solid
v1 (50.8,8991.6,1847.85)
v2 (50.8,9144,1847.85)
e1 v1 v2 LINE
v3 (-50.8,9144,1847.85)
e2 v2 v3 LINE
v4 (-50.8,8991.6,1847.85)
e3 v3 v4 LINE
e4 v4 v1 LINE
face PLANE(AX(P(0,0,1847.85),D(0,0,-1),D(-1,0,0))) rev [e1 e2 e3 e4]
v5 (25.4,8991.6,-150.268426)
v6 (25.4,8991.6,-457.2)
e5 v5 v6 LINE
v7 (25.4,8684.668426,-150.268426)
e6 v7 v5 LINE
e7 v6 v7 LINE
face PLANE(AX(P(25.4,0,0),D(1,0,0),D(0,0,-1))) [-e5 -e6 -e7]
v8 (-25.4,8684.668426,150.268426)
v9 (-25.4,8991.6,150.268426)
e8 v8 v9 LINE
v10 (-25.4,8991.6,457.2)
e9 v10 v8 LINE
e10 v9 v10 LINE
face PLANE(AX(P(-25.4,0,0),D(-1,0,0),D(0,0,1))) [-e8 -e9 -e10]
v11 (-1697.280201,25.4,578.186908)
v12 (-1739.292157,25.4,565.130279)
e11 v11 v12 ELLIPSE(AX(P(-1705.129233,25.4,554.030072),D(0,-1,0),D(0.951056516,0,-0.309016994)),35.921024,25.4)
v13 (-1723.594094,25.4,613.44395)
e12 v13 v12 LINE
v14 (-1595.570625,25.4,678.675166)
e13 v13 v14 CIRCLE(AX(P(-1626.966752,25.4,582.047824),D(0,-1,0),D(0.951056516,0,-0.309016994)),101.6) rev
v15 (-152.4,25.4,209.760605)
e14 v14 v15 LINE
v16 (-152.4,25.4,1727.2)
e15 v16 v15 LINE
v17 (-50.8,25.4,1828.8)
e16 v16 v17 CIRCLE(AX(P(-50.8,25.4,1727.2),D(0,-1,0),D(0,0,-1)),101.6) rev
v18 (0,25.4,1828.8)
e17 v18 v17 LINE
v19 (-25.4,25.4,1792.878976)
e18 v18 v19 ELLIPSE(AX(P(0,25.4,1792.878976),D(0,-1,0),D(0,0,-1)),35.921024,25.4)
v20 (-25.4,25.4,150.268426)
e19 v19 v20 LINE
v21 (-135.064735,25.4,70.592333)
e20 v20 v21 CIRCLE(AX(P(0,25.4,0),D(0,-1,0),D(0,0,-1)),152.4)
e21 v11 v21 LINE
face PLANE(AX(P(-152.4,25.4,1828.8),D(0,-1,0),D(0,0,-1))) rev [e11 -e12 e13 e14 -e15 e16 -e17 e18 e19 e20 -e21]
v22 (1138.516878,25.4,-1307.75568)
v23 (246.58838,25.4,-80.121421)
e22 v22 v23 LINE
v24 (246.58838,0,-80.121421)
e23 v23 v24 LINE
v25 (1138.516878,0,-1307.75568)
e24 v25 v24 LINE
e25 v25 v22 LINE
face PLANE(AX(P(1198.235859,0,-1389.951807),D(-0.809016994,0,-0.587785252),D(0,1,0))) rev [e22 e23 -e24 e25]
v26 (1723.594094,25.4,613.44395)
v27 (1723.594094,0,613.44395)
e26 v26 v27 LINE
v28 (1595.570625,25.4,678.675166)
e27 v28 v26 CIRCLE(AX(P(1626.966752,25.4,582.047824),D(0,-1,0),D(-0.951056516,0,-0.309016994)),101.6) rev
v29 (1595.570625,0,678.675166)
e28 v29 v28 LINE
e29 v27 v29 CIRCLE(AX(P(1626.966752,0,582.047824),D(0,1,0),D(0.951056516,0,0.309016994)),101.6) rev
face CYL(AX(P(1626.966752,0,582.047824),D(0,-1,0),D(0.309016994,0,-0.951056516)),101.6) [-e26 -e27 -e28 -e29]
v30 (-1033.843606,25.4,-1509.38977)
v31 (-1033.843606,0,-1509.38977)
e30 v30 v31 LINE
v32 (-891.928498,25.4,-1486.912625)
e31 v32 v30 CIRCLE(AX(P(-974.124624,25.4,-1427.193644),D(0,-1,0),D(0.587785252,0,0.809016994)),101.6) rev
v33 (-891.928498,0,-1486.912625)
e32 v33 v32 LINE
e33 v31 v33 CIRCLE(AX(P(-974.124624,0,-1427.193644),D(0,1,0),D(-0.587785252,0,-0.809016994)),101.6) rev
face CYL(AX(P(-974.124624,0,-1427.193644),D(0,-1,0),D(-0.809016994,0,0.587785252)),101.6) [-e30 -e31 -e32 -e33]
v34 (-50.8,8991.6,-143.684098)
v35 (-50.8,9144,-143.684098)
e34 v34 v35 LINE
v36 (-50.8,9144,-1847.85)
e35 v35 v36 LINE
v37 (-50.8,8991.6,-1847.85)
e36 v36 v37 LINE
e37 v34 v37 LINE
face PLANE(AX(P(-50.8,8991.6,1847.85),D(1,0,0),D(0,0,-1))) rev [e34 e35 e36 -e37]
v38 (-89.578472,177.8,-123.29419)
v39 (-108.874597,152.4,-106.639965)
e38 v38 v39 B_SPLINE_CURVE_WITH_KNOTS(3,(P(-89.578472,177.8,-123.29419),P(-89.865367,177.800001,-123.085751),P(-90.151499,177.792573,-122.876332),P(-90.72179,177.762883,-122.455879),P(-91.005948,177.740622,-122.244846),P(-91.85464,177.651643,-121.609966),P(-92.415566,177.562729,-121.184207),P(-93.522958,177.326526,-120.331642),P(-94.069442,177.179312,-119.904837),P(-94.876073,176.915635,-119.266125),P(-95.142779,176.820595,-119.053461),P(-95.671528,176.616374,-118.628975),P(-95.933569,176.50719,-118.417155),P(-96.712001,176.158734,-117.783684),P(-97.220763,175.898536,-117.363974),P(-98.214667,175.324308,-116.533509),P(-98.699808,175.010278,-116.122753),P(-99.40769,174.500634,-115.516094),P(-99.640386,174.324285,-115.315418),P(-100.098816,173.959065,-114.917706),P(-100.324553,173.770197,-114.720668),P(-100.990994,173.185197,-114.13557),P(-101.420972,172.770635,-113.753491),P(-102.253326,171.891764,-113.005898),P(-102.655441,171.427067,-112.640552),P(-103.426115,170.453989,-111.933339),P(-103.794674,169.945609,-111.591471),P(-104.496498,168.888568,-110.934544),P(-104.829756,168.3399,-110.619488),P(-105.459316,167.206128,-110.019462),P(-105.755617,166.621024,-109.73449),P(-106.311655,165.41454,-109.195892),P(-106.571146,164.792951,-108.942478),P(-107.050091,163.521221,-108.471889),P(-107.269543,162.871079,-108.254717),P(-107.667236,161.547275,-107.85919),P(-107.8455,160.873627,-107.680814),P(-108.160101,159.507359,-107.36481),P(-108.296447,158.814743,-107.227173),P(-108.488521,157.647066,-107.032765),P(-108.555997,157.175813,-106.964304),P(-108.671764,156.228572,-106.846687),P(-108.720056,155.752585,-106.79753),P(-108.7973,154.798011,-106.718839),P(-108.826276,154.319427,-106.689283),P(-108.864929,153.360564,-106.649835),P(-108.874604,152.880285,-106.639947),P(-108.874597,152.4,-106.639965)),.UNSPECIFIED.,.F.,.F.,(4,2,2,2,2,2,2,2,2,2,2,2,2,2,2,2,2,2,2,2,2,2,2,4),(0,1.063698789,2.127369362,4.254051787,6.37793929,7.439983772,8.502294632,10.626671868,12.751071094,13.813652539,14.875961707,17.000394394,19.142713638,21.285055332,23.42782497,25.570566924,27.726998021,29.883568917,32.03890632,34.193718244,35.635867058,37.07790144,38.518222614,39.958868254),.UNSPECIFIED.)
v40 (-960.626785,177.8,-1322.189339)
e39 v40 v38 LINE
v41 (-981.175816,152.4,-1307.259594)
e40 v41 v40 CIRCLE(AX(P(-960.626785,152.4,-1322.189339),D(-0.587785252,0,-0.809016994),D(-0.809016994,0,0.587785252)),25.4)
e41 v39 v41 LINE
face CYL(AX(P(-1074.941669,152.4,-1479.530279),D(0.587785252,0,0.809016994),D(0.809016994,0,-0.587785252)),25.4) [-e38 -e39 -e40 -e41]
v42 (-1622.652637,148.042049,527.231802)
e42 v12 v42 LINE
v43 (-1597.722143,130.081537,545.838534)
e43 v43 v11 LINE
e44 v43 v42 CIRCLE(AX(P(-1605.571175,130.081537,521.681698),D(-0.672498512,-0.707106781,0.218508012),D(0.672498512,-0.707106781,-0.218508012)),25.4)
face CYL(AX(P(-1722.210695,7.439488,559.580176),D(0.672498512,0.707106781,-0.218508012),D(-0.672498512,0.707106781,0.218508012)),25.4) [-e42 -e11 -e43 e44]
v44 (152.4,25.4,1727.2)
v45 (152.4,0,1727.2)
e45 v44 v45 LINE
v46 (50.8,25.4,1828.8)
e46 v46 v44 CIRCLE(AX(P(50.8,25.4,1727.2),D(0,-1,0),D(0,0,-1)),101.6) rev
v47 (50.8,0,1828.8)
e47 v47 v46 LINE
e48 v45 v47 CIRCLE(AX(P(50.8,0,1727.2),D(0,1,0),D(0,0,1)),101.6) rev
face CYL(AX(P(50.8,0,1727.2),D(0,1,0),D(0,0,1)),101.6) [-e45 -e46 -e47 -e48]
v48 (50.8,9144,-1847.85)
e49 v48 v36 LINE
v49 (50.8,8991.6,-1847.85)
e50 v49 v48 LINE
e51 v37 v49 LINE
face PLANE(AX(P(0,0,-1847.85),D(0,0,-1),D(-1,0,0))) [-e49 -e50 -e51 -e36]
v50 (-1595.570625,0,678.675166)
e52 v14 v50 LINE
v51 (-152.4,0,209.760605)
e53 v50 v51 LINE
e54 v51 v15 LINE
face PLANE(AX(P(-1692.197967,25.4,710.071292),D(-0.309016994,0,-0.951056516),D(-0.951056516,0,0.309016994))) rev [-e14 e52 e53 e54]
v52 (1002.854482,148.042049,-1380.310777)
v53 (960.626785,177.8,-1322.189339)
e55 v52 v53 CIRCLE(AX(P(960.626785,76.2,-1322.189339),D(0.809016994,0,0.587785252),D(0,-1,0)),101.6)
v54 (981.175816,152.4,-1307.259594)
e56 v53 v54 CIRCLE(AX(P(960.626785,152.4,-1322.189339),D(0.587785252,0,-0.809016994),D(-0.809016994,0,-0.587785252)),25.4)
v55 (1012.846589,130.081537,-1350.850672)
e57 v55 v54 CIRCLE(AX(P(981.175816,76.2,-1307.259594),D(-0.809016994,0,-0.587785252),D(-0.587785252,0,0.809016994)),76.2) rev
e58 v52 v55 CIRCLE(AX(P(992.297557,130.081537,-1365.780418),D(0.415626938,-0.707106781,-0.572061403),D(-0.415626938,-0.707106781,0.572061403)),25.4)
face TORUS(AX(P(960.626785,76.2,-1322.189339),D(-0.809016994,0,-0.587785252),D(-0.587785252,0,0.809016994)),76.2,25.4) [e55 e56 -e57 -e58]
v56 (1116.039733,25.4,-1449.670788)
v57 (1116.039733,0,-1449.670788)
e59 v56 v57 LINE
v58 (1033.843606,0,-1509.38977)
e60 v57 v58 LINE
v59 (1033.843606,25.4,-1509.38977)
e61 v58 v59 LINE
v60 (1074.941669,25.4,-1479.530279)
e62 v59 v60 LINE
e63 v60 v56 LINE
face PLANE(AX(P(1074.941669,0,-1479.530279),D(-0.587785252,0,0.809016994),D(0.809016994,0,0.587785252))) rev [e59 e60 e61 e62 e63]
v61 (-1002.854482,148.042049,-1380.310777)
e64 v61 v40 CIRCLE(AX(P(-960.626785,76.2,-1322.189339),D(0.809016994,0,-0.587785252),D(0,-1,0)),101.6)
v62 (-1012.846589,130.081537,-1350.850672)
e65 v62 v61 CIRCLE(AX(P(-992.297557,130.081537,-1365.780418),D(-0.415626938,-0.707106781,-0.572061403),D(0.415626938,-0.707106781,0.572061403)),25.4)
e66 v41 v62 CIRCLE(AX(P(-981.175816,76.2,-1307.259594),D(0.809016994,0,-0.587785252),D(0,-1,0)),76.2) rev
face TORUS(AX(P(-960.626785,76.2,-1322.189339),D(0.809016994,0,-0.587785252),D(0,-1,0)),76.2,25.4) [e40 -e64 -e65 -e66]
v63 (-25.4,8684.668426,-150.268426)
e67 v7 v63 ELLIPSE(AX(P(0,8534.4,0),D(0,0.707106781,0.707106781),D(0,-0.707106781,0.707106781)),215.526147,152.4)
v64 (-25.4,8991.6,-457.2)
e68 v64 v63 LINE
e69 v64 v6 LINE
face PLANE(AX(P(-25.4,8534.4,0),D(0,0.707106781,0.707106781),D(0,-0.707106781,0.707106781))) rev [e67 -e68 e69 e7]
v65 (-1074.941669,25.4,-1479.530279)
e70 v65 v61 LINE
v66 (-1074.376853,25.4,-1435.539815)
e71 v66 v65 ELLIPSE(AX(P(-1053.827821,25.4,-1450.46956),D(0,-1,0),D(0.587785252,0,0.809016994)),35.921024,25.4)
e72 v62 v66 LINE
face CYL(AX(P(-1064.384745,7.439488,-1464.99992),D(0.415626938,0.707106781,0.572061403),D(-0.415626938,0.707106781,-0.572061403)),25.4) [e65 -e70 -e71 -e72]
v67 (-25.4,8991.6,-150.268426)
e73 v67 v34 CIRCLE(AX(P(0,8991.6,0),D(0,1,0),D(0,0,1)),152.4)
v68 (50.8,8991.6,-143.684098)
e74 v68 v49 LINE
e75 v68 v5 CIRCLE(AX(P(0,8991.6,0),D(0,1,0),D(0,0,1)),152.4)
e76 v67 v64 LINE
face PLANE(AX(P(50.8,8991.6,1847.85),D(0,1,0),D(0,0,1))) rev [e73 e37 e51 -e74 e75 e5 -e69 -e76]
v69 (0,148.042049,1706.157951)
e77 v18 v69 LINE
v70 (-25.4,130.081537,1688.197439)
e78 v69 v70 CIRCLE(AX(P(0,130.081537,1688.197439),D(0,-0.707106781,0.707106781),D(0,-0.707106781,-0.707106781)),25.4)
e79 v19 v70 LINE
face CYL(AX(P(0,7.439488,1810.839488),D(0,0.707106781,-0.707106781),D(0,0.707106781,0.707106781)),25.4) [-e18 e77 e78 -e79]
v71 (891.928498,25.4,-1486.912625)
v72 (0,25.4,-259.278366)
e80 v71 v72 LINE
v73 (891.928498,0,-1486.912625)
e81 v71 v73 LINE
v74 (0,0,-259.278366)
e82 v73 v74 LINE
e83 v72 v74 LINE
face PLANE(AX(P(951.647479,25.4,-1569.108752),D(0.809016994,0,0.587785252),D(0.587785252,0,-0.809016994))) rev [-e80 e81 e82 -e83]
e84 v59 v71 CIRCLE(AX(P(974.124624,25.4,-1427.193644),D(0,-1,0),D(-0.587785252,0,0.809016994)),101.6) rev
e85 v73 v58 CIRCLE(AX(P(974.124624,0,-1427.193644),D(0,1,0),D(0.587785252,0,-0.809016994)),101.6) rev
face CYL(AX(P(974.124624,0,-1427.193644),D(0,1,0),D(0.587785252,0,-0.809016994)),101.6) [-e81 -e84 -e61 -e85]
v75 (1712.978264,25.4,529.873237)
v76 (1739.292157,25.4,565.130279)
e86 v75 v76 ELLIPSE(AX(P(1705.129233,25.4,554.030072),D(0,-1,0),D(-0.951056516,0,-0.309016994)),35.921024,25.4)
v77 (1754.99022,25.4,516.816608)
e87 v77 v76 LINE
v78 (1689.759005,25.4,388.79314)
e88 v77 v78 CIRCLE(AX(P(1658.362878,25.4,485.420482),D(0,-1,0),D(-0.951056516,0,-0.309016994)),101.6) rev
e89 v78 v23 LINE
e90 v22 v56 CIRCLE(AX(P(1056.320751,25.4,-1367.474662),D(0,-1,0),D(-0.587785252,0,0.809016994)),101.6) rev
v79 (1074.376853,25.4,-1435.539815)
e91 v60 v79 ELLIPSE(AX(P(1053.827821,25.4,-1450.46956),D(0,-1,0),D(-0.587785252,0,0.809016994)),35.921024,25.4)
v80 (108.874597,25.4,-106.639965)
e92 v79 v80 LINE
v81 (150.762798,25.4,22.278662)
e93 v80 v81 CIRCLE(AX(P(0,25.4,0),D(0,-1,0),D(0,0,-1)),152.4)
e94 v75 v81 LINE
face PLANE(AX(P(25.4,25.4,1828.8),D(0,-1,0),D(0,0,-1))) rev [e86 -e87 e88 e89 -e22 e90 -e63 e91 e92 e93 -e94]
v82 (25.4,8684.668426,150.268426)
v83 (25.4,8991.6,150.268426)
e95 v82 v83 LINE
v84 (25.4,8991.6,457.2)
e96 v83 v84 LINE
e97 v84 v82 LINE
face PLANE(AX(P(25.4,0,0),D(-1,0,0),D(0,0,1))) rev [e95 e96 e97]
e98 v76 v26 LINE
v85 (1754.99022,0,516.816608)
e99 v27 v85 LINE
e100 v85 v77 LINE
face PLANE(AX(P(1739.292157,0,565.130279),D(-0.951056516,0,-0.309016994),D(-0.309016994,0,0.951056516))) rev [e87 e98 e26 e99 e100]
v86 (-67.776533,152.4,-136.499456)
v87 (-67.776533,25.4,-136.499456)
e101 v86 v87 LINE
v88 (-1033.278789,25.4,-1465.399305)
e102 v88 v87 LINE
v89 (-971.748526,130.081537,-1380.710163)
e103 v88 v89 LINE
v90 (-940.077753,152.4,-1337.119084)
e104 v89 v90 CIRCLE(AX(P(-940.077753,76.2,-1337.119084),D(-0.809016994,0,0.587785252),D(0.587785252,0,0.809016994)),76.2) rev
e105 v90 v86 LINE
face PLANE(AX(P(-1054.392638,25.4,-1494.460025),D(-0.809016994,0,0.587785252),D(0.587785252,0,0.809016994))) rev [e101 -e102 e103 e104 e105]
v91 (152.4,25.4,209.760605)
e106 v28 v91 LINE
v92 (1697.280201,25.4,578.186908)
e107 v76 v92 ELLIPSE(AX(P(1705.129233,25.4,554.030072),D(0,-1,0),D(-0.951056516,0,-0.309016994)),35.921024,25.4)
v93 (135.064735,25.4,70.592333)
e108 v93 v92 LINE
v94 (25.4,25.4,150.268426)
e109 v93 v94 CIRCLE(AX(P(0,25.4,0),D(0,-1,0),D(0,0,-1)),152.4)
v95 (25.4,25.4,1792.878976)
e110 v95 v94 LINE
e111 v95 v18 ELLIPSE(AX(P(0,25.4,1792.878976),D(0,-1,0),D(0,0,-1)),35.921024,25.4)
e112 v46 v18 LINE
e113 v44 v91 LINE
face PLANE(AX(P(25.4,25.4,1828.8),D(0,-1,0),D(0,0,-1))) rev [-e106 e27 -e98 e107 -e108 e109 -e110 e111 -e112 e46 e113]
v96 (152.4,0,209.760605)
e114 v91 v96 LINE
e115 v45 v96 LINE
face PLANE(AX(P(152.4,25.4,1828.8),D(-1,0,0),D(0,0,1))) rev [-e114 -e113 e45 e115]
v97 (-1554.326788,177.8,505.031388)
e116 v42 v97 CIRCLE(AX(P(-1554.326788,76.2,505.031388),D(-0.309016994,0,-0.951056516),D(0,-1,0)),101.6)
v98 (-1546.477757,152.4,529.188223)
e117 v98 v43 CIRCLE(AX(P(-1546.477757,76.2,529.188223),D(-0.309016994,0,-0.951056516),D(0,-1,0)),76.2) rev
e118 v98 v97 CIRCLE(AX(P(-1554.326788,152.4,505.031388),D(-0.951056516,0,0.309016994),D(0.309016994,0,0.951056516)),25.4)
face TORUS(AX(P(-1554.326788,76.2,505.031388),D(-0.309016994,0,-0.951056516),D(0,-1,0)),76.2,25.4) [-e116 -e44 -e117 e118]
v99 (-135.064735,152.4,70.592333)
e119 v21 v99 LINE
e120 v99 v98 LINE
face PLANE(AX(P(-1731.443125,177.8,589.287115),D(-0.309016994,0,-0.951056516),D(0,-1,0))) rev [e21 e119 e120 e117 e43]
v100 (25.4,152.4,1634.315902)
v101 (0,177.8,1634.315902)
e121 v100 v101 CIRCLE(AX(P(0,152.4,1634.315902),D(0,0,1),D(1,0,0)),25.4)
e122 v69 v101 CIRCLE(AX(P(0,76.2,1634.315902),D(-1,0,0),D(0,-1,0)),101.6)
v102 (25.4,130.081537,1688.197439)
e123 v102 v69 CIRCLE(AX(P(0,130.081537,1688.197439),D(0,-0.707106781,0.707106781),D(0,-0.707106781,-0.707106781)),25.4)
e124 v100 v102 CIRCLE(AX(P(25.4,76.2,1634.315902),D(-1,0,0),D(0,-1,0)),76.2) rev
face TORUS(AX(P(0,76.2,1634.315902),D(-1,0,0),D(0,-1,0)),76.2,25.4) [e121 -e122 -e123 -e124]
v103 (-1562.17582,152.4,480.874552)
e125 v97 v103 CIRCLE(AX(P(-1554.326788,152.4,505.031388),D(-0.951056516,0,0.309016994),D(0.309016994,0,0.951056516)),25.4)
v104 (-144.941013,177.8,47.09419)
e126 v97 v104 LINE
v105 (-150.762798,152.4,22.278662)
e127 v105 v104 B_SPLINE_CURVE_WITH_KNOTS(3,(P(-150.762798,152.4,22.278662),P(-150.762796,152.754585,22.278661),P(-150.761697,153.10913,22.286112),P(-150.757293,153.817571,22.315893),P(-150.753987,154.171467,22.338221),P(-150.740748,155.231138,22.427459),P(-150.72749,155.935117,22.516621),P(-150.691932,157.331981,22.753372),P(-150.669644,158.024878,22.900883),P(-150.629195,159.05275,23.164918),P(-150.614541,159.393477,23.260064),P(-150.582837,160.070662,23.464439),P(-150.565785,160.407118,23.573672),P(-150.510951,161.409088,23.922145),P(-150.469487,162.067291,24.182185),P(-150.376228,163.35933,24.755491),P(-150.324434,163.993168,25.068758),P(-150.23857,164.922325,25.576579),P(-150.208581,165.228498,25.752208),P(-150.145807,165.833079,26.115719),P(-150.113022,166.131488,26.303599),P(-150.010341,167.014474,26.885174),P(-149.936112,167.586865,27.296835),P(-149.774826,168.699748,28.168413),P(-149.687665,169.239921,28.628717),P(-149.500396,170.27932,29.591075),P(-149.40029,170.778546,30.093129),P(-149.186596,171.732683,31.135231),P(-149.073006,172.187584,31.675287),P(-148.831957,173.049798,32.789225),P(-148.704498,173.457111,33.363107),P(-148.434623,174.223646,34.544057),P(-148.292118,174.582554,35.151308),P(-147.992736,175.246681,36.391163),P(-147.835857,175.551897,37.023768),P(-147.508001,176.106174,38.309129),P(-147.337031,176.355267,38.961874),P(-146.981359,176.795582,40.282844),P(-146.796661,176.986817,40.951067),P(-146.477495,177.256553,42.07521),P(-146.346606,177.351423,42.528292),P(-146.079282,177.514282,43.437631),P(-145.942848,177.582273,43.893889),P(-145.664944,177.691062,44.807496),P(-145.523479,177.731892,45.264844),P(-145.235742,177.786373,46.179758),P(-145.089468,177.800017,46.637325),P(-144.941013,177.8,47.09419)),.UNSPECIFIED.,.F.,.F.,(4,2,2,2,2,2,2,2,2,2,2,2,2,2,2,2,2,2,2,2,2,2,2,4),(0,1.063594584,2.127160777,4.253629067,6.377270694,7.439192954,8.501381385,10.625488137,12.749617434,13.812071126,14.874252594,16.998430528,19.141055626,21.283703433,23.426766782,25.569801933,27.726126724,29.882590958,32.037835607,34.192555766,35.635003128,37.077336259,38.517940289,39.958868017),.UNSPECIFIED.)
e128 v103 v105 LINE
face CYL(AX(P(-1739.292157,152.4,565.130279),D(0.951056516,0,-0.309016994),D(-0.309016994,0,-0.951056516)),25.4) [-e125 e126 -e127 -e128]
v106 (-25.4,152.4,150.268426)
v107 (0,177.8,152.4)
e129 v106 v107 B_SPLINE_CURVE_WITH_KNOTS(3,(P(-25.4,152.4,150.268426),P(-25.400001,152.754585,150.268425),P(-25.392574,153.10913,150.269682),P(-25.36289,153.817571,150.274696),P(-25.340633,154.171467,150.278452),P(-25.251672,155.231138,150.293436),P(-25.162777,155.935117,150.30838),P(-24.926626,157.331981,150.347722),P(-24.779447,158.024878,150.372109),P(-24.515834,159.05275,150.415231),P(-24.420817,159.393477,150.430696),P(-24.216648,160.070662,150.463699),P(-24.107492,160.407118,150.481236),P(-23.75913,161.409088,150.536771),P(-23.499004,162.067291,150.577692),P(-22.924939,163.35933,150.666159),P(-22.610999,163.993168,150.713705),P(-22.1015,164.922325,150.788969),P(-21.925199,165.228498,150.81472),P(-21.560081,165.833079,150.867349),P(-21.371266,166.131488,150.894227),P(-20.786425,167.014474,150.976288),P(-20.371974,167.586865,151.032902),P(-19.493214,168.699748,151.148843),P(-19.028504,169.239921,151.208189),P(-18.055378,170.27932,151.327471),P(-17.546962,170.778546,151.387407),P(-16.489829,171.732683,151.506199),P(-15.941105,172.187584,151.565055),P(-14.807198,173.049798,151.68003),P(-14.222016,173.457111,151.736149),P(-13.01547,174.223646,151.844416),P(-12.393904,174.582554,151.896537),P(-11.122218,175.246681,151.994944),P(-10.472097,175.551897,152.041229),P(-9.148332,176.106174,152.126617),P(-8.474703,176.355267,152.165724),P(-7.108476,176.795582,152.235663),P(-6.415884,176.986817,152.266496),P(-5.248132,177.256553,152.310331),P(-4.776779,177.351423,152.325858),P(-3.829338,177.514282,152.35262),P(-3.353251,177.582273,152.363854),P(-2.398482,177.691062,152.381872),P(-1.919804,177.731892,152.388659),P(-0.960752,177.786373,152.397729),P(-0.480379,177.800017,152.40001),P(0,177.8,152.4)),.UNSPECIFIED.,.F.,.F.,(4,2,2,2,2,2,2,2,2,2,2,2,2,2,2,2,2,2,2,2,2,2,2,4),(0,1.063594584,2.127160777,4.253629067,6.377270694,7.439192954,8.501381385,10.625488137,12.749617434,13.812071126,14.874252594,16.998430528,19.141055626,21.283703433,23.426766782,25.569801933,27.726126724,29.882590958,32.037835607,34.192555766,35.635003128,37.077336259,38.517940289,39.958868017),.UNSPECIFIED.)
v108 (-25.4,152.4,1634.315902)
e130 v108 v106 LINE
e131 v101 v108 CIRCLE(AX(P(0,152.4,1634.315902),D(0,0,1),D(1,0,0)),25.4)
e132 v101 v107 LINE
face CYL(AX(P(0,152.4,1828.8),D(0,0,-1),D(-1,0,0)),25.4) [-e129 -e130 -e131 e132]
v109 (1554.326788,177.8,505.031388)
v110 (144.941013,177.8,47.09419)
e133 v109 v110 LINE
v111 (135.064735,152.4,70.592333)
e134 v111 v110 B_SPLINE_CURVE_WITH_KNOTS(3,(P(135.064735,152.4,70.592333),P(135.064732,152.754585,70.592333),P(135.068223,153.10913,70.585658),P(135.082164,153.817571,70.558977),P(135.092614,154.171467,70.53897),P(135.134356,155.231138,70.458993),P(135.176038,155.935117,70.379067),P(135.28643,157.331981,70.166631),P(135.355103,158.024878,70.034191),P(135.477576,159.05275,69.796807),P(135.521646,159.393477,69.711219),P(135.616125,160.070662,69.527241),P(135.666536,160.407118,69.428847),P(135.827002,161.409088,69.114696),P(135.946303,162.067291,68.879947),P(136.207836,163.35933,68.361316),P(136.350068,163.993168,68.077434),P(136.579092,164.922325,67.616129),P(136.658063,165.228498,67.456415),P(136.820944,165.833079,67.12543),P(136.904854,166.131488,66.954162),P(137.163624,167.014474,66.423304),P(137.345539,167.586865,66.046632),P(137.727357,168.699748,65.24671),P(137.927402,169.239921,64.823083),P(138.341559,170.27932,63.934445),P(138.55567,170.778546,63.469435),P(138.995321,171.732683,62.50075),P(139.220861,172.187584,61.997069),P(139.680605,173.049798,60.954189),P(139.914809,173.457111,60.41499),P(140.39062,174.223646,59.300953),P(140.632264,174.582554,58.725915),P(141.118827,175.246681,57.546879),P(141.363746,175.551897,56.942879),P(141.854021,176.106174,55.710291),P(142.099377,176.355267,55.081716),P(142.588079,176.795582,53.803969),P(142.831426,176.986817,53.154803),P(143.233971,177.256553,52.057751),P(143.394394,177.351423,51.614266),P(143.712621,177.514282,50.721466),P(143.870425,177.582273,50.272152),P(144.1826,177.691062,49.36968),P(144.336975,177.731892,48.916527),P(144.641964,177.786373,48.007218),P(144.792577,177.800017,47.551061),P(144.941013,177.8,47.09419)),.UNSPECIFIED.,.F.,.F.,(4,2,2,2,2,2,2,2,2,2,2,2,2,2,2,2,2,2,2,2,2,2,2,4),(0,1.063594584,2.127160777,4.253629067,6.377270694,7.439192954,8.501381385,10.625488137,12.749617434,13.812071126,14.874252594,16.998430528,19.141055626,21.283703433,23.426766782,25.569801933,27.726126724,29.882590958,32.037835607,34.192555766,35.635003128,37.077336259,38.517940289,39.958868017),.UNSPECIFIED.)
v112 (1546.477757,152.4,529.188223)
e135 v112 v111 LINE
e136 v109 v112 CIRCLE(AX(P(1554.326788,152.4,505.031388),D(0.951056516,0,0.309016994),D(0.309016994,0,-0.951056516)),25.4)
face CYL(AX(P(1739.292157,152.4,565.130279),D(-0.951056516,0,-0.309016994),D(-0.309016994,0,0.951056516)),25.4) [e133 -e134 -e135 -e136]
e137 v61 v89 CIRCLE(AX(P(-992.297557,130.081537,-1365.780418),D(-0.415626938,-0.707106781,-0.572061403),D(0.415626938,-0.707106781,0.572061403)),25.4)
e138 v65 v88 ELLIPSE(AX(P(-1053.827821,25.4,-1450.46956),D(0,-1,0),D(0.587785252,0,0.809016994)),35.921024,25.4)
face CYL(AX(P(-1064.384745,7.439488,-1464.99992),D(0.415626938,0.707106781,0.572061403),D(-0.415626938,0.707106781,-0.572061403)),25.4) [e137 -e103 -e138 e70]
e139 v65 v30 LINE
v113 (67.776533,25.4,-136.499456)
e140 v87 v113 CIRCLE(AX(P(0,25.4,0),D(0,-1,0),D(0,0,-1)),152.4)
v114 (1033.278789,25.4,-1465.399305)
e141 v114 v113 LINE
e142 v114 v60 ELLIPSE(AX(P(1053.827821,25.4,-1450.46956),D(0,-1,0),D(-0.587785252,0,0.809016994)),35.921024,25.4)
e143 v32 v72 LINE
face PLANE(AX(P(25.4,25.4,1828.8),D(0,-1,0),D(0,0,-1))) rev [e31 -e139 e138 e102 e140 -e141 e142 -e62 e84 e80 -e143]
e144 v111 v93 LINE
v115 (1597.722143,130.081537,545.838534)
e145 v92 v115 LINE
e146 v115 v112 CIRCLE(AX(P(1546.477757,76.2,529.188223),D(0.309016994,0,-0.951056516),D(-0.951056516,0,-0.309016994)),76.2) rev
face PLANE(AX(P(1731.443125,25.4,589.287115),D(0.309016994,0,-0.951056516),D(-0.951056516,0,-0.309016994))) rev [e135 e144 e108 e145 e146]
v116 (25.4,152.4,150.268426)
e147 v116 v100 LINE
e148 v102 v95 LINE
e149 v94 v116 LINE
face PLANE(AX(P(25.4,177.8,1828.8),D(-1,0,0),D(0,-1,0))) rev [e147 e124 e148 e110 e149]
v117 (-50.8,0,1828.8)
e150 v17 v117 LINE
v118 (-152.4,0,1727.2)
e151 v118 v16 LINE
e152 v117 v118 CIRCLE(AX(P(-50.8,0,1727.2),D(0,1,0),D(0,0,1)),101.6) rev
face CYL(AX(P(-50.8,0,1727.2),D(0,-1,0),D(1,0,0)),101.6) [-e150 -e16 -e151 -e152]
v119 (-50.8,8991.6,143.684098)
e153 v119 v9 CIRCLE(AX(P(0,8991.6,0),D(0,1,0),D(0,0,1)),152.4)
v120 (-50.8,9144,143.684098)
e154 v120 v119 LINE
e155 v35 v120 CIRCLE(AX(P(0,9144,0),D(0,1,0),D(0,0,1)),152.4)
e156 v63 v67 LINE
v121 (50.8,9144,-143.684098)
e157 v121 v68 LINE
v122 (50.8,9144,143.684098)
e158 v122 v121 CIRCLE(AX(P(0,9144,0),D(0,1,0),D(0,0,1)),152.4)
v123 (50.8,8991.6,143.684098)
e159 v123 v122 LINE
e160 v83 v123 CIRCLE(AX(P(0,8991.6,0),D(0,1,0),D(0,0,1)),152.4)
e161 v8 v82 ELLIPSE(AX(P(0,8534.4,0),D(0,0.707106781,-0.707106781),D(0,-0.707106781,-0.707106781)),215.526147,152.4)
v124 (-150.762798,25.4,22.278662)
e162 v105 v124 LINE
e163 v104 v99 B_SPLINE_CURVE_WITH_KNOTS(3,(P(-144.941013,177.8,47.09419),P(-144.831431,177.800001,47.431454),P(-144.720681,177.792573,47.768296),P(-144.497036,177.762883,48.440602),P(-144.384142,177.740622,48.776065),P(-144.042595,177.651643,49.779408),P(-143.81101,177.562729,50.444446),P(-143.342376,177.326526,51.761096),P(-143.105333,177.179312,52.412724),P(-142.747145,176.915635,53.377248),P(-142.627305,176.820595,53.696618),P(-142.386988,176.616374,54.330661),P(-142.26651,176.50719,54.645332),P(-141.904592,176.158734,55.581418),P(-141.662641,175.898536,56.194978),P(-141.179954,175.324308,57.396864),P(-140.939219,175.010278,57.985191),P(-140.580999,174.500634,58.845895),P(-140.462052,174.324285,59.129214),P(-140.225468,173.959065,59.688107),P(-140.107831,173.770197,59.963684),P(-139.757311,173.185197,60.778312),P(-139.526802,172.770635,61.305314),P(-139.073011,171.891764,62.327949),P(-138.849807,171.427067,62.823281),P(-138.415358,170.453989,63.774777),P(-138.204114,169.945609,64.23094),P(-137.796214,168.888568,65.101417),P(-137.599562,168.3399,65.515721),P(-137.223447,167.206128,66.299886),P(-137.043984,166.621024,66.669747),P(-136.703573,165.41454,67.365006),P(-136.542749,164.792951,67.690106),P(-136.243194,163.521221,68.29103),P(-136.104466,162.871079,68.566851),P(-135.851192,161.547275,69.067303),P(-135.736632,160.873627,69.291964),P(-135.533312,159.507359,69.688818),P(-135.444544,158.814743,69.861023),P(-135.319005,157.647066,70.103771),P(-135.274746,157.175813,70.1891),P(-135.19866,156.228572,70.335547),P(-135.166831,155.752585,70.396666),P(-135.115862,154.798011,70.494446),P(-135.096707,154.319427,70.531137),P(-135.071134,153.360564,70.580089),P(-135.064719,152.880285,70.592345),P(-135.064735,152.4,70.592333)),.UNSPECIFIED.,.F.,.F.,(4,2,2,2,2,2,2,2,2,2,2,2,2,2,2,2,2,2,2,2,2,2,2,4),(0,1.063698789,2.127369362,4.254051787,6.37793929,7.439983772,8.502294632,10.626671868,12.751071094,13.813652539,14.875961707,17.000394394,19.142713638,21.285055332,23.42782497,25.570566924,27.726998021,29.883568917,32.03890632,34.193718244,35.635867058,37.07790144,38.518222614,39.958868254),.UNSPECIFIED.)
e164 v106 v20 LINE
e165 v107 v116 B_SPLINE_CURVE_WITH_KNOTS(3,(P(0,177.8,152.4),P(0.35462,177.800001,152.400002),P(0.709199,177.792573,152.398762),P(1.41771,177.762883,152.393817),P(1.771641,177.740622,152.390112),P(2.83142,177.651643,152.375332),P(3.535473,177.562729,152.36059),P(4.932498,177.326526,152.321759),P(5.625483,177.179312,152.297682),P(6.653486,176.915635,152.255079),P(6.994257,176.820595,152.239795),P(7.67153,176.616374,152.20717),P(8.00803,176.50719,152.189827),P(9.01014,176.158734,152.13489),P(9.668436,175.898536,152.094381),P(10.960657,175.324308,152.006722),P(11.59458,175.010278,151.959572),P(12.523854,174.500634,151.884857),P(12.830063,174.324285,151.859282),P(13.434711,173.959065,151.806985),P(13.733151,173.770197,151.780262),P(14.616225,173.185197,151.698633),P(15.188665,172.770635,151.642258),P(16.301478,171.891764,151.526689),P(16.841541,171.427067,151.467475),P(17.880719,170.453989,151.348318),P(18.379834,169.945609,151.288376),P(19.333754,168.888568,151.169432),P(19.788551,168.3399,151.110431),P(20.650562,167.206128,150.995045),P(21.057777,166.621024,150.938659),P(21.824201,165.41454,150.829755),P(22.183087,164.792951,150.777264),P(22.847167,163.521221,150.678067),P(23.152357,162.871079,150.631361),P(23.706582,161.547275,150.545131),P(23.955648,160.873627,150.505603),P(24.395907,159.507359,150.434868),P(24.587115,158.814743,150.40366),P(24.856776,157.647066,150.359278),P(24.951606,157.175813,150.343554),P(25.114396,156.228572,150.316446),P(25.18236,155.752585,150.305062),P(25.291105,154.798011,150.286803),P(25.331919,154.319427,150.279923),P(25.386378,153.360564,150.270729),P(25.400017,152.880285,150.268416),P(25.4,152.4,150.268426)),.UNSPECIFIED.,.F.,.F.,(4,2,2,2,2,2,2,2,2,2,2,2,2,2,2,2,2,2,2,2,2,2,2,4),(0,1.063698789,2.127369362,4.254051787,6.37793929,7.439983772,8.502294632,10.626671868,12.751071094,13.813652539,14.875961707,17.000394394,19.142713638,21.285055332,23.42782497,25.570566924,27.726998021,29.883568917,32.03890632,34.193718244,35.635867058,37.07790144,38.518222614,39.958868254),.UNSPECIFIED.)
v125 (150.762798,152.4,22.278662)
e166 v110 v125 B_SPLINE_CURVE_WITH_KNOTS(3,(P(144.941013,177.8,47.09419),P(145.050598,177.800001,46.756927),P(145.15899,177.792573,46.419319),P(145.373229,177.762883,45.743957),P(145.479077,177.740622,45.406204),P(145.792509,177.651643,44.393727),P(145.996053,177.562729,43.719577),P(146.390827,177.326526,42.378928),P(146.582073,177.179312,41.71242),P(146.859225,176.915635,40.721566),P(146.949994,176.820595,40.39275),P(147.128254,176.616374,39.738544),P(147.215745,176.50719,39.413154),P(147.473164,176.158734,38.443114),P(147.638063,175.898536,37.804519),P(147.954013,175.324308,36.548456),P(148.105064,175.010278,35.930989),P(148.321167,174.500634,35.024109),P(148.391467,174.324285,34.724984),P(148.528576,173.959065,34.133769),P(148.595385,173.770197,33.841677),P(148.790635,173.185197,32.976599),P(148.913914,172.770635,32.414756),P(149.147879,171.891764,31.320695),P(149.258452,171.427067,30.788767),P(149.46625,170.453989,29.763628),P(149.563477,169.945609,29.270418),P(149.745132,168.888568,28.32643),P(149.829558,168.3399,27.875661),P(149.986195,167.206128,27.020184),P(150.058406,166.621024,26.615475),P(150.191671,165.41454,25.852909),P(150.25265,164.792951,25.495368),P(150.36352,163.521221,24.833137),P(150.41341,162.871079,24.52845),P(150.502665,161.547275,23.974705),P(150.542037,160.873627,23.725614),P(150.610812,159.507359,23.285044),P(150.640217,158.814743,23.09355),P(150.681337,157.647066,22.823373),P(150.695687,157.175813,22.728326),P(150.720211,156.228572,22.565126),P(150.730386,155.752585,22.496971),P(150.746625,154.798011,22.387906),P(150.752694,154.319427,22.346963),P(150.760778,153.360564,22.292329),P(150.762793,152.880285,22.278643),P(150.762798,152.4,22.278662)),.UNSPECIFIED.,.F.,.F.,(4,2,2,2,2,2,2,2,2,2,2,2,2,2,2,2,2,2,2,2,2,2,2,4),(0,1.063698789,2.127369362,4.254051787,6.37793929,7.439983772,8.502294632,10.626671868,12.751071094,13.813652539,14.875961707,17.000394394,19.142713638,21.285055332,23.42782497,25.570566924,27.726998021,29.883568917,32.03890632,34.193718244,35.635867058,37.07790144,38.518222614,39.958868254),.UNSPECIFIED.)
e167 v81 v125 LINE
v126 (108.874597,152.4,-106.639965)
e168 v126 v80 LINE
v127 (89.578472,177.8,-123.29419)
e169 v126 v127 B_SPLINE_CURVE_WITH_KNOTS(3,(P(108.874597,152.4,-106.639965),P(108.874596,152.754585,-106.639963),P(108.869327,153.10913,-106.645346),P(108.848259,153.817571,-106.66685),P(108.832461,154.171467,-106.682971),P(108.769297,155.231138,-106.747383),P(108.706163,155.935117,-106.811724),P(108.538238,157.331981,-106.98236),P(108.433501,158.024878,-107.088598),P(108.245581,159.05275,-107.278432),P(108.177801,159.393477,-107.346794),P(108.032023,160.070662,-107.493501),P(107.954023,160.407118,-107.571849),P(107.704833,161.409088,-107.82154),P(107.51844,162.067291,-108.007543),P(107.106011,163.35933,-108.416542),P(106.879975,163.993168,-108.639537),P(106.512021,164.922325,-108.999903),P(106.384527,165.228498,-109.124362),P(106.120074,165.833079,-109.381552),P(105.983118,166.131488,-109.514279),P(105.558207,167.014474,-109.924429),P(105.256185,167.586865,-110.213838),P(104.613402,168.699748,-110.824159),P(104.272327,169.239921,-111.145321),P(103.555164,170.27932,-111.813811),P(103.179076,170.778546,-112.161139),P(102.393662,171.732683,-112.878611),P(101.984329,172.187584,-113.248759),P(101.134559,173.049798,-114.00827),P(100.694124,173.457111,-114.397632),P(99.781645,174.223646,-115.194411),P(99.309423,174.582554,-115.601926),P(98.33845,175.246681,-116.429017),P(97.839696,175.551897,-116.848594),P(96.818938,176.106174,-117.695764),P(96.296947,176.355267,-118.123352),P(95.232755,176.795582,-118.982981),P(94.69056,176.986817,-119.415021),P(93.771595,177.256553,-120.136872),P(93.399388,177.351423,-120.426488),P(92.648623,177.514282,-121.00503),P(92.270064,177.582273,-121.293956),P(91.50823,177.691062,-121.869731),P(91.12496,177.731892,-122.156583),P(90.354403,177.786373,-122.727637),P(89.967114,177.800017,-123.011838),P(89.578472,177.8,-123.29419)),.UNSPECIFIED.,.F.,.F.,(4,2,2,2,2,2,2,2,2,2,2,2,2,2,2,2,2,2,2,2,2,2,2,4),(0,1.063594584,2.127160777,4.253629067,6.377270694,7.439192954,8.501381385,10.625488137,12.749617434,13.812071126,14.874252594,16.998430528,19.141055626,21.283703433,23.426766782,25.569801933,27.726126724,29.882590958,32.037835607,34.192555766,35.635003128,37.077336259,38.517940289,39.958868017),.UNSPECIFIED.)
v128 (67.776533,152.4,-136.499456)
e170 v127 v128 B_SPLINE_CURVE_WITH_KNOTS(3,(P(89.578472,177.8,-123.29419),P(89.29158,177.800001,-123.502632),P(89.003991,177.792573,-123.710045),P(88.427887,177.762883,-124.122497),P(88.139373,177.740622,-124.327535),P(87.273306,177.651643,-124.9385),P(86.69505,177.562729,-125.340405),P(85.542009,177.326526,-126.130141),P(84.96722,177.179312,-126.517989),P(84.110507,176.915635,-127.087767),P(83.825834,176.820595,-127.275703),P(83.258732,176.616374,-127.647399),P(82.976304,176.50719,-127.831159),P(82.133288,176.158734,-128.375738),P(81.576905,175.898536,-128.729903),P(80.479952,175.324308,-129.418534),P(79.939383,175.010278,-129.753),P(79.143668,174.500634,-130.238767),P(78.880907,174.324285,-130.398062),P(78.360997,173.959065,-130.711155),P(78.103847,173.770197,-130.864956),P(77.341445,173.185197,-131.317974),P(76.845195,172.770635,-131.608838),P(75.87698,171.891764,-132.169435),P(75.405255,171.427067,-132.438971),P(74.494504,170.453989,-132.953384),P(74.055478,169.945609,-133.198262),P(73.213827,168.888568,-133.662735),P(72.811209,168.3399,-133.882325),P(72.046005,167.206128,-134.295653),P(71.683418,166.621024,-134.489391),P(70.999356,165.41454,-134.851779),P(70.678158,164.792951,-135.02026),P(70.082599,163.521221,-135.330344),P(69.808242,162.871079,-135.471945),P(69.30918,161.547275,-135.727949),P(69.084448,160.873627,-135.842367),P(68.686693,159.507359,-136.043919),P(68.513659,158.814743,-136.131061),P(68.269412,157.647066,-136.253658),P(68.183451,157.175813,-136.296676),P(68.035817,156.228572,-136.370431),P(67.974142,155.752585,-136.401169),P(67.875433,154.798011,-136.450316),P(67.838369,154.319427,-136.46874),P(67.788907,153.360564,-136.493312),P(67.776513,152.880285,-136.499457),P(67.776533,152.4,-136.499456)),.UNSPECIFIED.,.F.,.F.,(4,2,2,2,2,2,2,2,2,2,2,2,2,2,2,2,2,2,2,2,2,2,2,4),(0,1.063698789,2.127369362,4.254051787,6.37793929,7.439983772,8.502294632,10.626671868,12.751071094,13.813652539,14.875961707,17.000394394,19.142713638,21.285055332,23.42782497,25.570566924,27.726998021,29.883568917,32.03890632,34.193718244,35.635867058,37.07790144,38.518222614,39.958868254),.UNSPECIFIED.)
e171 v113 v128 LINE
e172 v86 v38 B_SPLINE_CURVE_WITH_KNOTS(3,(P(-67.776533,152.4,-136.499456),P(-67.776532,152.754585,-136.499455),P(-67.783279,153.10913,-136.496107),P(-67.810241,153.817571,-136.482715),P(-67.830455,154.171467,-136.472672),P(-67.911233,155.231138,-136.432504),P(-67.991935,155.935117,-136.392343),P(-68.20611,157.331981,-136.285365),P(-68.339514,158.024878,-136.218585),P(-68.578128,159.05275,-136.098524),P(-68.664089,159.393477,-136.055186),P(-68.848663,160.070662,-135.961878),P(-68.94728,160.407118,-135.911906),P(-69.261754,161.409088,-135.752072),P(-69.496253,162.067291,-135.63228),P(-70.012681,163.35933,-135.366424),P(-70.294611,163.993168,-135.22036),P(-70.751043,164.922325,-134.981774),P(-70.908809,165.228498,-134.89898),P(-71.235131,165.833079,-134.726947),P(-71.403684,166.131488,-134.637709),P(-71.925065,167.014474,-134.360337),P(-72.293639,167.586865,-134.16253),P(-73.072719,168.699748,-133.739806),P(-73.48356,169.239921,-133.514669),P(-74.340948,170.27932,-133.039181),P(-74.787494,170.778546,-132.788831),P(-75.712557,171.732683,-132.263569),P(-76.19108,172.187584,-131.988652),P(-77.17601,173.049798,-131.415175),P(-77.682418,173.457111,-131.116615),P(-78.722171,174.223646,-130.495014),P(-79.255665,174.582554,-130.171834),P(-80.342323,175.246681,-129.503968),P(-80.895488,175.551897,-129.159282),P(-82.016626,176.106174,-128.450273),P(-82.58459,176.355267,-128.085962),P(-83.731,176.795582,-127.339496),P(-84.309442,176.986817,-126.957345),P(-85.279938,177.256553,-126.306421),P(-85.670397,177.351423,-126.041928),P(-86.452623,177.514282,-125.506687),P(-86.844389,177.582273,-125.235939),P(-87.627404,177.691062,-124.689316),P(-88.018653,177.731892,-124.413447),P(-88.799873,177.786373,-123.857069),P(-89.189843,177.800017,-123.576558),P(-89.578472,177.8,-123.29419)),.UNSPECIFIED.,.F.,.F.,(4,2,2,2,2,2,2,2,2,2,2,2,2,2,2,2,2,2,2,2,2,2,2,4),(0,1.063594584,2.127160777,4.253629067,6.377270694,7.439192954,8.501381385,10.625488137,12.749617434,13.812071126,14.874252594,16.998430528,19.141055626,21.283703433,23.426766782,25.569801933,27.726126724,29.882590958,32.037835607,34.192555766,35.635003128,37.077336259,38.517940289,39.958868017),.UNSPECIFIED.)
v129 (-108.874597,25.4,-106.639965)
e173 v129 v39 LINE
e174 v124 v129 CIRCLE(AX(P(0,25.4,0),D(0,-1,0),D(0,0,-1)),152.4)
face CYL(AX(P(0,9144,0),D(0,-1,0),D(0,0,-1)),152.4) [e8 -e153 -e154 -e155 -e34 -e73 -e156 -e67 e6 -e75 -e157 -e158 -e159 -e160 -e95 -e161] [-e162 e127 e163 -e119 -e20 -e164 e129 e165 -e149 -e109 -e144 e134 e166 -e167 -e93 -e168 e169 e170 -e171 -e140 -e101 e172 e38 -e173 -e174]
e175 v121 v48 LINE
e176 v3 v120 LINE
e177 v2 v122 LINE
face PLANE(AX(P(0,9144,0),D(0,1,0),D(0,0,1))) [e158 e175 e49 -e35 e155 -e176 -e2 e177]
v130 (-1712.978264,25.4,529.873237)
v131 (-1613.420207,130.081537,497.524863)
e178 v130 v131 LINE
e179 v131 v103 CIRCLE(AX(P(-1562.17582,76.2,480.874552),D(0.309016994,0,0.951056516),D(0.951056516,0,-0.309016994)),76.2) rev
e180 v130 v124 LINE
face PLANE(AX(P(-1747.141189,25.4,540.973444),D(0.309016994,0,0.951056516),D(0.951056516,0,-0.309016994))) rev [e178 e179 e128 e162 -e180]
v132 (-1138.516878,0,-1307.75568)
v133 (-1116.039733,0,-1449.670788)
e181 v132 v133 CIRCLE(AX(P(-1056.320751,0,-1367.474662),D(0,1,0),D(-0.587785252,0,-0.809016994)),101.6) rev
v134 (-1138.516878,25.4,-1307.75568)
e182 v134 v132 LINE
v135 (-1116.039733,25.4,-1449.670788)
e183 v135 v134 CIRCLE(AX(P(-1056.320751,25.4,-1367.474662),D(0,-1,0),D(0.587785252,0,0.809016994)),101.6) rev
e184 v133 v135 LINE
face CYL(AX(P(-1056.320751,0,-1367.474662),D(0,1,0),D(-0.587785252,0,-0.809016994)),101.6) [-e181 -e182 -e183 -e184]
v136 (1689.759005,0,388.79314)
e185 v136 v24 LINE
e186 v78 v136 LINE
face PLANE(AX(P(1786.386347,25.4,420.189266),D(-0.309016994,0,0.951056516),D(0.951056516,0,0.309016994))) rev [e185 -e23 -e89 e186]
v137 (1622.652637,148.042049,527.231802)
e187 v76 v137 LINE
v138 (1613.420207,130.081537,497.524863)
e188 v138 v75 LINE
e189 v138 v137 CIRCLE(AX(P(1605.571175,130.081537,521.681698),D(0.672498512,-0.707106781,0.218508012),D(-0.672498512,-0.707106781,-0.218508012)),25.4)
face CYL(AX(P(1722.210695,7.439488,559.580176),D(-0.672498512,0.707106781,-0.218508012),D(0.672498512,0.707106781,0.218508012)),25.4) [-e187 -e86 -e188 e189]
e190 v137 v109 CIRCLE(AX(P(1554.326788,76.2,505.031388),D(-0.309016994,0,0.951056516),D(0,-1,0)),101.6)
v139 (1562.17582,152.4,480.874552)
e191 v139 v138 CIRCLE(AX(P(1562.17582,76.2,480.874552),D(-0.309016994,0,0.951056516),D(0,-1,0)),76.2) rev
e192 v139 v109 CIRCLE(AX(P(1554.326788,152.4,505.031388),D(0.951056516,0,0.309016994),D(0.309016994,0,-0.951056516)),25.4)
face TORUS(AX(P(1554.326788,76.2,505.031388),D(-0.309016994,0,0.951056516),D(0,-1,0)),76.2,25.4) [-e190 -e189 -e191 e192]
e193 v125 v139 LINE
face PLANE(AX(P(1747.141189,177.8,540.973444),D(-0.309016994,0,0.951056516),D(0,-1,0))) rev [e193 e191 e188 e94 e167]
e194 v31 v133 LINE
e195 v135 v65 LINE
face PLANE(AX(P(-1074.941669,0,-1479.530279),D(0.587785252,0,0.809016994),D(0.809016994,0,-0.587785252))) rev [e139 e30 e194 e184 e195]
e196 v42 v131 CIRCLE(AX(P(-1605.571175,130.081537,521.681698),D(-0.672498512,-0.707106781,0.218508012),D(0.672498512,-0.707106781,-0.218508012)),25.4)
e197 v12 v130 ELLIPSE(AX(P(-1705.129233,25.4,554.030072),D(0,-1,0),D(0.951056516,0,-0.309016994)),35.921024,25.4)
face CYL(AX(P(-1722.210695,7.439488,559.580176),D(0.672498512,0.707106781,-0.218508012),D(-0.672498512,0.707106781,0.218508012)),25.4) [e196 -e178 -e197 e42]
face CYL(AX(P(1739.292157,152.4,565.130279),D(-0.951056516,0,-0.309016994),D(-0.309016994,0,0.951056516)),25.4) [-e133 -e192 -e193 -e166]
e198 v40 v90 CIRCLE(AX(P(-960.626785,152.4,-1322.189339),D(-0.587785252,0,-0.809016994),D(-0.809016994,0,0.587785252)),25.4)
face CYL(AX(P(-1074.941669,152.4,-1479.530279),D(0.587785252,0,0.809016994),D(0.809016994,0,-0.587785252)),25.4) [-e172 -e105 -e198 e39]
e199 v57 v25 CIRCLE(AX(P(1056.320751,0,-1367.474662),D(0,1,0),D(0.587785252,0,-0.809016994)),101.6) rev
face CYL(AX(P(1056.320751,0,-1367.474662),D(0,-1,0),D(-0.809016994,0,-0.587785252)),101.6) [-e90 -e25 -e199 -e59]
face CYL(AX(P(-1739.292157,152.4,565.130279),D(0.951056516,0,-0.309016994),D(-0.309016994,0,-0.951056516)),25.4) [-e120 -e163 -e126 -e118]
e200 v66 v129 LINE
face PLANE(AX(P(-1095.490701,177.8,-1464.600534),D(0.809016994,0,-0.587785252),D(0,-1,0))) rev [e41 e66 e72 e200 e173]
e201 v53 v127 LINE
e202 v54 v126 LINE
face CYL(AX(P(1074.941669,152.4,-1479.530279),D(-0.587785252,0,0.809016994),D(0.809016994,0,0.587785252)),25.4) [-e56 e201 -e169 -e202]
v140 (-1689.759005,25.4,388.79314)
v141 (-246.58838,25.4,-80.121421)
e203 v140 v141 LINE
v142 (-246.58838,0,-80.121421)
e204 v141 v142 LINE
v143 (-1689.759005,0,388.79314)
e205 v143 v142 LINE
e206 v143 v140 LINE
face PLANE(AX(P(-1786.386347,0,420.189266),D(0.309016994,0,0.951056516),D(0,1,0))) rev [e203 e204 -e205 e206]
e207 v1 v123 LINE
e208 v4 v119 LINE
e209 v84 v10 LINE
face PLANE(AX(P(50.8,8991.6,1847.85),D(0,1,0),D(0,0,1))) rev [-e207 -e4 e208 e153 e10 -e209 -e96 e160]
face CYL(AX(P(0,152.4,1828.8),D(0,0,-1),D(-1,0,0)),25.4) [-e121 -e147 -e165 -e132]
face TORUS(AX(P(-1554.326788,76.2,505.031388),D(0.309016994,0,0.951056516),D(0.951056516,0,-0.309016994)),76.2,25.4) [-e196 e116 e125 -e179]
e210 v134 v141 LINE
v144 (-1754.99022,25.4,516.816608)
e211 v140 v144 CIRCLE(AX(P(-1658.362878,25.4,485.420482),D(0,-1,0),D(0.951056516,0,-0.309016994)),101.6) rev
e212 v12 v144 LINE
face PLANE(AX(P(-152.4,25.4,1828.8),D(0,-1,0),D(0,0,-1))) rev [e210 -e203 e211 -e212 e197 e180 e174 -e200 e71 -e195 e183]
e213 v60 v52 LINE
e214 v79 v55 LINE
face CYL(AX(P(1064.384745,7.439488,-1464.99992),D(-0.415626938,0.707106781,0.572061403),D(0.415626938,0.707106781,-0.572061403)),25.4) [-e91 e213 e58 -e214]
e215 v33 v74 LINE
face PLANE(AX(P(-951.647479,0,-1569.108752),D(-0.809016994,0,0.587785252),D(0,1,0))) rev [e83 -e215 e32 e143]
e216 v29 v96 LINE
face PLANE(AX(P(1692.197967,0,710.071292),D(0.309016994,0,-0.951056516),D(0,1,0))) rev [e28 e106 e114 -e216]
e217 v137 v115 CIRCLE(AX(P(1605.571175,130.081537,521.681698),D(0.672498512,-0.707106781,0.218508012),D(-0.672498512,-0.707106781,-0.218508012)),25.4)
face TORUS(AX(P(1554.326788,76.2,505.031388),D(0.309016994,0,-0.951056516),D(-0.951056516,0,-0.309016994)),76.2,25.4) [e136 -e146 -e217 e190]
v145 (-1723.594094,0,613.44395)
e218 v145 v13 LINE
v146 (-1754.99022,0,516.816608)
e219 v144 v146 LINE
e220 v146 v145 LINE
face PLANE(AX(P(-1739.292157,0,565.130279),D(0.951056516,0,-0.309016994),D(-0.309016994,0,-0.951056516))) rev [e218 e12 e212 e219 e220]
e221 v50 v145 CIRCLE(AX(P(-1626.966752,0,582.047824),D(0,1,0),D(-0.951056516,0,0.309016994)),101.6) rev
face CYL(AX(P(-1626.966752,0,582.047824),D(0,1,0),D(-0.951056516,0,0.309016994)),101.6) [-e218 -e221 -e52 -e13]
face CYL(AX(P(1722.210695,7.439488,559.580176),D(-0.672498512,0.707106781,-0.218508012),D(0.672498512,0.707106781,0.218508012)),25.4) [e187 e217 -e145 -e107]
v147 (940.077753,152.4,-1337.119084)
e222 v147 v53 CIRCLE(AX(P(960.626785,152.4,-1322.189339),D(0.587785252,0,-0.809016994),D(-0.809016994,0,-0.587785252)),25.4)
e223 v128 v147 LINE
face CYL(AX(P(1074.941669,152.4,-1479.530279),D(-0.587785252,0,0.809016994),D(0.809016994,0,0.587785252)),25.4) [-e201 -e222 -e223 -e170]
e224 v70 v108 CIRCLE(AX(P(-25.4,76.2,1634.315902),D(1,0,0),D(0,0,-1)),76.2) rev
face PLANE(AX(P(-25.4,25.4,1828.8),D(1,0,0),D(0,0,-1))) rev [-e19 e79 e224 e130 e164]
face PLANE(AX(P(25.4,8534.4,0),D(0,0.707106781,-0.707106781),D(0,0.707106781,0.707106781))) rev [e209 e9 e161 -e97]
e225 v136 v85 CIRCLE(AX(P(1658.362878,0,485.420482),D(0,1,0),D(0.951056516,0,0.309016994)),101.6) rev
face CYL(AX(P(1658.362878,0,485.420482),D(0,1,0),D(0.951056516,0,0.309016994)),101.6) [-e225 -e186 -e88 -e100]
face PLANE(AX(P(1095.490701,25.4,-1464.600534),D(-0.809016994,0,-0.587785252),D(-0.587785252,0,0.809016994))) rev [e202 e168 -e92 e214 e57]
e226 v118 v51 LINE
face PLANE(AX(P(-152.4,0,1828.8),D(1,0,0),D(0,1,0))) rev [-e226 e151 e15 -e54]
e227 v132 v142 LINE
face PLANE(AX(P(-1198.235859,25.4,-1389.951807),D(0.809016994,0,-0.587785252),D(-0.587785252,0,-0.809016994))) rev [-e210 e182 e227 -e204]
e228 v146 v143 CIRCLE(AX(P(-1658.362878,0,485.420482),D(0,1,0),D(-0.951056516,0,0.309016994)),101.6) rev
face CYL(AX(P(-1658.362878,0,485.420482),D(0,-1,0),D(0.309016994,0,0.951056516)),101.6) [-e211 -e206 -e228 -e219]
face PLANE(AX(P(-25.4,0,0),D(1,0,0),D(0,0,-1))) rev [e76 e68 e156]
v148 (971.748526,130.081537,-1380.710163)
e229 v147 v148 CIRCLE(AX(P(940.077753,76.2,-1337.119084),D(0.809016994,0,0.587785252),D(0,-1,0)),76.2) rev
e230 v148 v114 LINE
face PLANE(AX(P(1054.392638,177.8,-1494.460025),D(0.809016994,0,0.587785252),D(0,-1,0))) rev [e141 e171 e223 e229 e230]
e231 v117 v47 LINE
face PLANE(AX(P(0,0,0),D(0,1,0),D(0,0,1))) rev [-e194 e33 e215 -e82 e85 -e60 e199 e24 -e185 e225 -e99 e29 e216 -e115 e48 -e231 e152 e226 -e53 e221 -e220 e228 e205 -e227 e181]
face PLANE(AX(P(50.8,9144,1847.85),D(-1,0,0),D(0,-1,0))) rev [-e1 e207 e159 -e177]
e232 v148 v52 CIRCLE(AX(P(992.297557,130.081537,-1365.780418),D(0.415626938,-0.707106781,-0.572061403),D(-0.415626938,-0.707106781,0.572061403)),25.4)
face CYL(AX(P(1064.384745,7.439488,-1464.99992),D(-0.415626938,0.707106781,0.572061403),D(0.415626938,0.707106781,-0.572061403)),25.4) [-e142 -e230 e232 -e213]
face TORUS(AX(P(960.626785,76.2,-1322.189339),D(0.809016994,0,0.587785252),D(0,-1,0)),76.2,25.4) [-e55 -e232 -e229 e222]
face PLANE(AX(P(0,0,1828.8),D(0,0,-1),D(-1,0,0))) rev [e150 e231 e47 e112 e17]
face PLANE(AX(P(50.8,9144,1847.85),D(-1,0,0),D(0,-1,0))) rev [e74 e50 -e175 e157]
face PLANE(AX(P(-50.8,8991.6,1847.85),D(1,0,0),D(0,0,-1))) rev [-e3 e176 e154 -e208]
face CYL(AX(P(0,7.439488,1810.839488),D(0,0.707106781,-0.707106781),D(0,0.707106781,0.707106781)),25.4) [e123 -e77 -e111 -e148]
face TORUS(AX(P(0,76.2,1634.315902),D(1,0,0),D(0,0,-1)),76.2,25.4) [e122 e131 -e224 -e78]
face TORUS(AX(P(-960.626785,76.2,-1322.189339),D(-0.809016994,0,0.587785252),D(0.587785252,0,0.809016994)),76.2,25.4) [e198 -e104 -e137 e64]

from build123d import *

# Parameters (mm, degrees)
SKETCH1_R           = 152.4
BOSS_EXTRUDE1_DEPTH = 9144
BOSS_EXTRUDE3_DEPTH = 1828.8
CUT_EXTRUDE1_DEPTH  = 9327.781775082
FILLET10_R          = 101.6
FILLET12_R          = 25.4
CIRPATTERN10_COUNT  = 5
SKETCH4_W           = 101.6
SKETCH4_H           = 152.4
BOSS_EXTRUDE5_DEPTH = 1847.85
BOSS_EXTRUDE6_DEPTH = 25.4
CIRPATTERN11_COUNT  = 2


with BuildPart() as part:
    # Sketch1 → Boss-Extrude1 (new body)
    with BuildSketch(Plane(origin=(0, 0, 0), x_dir=(1, 0, 0), z_dir=(0, 1, 0))):
        with Locations(Location((0, 0, 0), (0, 0, 270))):
            Circle(SKETCH1_R)
    extrude(amount=BOSS_EXTRUDE1_DEPTH)

    # Sketch2 → Boss-Extrude3 (add)
    with BuildSketch(Plane.XY):
        Polygon((-152.4, 0), (-152.4, 25.4), (-25.4, 25.4), (-25.4, 177.8), (25.4, 177.8), (25.4, 25.4), (152.4, 25.4), (152.4, 0), align=None)
    extrude(amount=BOSS_EXTRUDE3_DEPTH)

    # Sketch3 → Cut-Extrude1 (cut, through all)
    with BuildSketch(Plane(origin=(25.4, 0, 0), x_dir=(0, 0, -1), z_dir=(1, 0, 0))):
        Polygon((-1828.8, 25.4), (-1676.4, 177.8), (-1828.8, 177.8), align=None)
    extrude(amount=-CUT_EXTRUDE1_DEPTH, mode=Mode.SUBTRACT)

    # Fillet10
    fillet10_edges = [part.edges().sort_by_distance(p)[0] for p in [
        (152.4, 12.7, 1828.8),
        (-152.4, 12.7, 1828.8),
        (0, 177.8, 1676.4),
    ]]
    fillet(fillet10_edges, radius=FILLET10_R)

    # Fillet12
    fillet12_edges = [part.edges().sort_by_distance(p)[0] for p in [
        (-25.4, 86.721024484, 1767.478975516),
        (-25.4, 170.066160503, 1673.196538791),
        (25.4, 86.721024484, 1767.478975516),
        (25.4, 170.066160503, 1673.196538791),
        (-25.4, 177.8, 892.292164277),
        (25.4, 177.8, 892.292164277),
    ]]
    fillet(fillet12_edges, radius=FILLET12_R - 0.0001)  # a hair under: the kernel refuses the full size


with BuildPart() as cirpattern10_1:
    # CirPattern10: pattern copy
    add(part.part.rotate(Axis((0, 0, 0), (0, 1, 0)), 1 * 360 / CIRPATTERN10_COUNT))


with BuildPart() as cirpattern10_2:
    # CirPattern10: pattern copy
    add(part.part.rotate(Axis((0, 0, 0), (0, 1, 0)), 2 * 360 / CIRPATTERN10_COUNT))


with BuildPart() as cirpattern10_3:
    # CirPattern10: pattern copy
    add(part.part.rotate(Axis((0, 0, 0), (0, 1, 0)), 3 * 360 / CIRPATTERN10_COUNT))


with BuildPart() as cirpattern10_4:
    # CirPattern10: pattern copy
    add(part.part.rotate(Axis((0, 0, 0), (0, 1, 0)), 4 * 360 / CIRPATTERN10_COUNT))


with BuildPart() as part_1:
    add(part.part)

    add(cirpattern10_1.part)  # Boss-Extrude5 merges CirPattern10_1

    add(cirpattern10_2.part)  # Boss-Extrude5 merges CirPattern10_2

    add(cirpattern10_3.part)  # Boss-Extrude5 merges CirPattern10_3

    add(cirpattern10_4.part)  # Boss-Extrude5 merges CirPattern10_4
    # Sketch4 → Boss-Extrude5 (add, symmetric)
    with BuildSketch(Plane.XY):
        with Locations((0, 9067.8)):
            Rectangle(SKETCH4_W, SKETCH4_H)
    extrude(amount=BOSS_EXTRUDE5_DEPTH, both=True)

    # Sketch5 → Boss-Extrude6 (add, symmetric)
    with BuildSketch(Plane(origin=(0, 0, 0), x_dir=(0, 0, -1), z_dir=(1, 0, 0))):
        Polygon((0, 9144), (0, 8534.4), (-609.6, 9144), align=None)
    boss_extrude6 = extrude(amount=BOSS_EXTRUDE6_DEPTH, both=True)

    # CirPattern11: Boss-Extrude6 ×2 about axis
    cirpattern11_axis = Axis((0, 9144, 0), (0, 1, 0))
    for i in range(1, CIRPATTERN11_COUNT):
        add(boss_extrude6.rotate(cirpattern11_axis, i * 360 / CIRPATTERN11_COUNT))


solid = part_1.part
